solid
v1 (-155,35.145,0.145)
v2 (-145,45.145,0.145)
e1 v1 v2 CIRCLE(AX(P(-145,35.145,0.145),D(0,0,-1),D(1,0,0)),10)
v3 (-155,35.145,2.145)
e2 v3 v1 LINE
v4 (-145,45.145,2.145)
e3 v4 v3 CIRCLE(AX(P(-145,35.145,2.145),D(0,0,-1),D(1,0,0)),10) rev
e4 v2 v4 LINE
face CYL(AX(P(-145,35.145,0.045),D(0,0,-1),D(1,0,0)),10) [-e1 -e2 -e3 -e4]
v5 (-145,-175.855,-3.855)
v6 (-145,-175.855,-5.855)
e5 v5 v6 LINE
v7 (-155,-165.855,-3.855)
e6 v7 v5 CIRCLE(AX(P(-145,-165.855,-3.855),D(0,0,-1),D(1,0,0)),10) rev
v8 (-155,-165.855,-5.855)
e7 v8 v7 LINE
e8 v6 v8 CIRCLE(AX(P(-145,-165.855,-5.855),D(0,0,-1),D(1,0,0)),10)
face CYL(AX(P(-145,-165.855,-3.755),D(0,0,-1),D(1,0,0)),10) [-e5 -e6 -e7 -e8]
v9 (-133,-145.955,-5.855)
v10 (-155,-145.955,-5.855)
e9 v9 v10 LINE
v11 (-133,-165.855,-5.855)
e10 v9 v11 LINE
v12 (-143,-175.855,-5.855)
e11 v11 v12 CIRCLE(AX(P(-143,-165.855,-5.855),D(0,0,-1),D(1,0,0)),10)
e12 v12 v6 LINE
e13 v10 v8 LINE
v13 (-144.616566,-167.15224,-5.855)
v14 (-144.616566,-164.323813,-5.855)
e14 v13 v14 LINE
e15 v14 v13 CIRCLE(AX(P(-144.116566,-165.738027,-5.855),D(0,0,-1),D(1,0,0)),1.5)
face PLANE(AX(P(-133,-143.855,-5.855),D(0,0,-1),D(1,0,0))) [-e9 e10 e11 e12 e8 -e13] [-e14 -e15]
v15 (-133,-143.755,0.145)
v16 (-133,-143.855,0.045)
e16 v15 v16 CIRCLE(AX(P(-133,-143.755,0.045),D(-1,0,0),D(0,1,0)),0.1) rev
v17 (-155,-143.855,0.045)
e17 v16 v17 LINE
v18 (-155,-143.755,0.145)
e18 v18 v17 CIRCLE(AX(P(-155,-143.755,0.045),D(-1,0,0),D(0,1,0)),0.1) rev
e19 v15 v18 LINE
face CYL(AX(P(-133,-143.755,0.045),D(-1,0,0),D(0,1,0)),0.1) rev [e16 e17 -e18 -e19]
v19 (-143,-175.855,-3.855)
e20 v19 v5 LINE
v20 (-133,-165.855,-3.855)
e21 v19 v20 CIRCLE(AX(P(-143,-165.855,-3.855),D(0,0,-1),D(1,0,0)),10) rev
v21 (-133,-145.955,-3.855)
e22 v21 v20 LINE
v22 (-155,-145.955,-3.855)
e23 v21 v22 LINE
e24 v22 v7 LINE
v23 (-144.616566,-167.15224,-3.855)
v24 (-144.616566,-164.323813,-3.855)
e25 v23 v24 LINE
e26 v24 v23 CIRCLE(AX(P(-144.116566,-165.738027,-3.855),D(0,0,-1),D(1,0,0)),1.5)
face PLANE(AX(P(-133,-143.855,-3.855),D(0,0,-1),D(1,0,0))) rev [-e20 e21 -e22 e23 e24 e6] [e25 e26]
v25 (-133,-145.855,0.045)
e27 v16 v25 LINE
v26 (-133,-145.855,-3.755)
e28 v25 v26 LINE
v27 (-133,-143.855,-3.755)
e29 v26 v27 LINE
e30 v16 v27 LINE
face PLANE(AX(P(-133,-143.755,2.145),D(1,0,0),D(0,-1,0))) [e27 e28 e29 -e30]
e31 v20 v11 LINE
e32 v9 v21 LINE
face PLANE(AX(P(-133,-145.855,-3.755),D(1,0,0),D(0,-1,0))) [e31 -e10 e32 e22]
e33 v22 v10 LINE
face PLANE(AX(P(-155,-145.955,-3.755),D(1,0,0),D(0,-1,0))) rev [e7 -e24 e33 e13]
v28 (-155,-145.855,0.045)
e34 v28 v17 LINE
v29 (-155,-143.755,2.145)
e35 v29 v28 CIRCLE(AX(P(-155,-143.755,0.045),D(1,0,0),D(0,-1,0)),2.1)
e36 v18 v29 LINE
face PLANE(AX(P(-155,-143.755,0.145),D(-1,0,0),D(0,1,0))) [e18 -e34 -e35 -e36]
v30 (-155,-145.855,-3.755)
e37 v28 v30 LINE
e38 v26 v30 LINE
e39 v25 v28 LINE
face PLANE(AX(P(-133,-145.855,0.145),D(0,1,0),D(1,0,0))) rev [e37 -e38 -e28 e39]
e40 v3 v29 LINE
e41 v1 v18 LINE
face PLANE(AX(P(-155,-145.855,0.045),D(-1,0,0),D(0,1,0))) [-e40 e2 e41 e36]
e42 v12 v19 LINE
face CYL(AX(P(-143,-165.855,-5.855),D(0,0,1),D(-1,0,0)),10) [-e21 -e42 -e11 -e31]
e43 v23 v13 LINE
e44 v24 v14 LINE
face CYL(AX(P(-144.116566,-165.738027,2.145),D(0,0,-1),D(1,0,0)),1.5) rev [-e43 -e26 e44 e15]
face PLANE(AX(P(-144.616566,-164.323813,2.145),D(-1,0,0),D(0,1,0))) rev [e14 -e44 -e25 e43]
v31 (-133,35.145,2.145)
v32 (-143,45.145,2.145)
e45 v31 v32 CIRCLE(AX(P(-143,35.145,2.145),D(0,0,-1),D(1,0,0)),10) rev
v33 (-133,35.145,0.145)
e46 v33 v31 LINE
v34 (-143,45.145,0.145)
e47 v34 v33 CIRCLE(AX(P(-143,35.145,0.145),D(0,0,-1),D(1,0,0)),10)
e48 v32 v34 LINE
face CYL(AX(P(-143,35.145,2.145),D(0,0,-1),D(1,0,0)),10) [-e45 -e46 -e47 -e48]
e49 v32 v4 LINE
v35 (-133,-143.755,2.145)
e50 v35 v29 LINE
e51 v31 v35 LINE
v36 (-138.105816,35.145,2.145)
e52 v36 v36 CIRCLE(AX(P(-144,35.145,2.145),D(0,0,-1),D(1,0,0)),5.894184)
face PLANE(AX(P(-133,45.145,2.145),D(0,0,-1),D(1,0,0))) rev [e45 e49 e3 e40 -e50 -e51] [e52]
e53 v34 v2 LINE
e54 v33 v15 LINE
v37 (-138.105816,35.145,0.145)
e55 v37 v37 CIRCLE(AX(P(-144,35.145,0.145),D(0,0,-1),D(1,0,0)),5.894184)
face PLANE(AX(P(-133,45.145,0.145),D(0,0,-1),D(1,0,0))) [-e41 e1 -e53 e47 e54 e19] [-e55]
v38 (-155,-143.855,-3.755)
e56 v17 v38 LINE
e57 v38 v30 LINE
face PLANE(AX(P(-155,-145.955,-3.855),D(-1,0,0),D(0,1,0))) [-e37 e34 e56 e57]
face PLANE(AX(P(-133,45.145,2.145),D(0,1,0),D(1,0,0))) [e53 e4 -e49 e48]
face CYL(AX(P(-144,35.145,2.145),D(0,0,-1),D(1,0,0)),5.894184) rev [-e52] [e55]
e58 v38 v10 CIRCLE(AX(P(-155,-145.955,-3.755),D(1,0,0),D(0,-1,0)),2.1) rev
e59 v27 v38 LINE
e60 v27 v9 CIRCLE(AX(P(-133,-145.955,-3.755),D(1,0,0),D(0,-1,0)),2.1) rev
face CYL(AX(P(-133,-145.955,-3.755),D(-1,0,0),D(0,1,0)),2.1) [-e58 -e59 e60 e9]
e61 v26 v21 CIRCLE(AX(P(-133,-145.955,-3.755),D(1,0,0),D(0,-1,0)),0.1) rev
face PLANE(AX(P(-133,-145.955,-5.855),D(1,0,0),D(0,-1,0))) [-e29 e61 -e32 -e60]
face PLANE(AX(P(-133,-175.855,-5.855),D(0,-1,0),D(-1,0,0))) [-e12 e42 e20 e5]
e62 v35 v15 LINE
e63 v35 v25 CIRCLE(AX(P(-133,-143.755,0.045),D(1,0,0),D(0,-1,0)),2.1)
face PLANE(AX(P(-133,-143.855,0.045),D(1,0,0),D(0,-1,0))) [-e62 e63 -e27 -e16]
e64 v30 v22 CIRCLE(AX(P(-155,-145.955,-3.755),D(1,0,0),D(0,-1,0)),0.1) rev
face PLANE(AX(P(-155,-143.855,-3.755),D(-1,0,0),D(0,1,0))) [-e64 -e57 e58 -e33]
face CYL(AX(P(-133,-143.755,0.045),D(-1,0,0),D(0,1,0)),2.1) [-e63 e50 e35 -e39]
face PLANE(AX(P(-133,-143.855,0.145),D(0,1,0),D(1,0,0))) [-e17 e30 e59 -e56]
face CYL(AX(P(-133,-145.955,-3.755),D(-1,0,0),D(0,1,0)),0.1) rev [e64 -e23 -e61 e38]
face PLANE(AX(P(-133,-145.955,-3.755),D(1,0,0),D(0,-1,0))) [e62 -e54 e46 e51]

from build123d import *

# Parameters (mm, degrees)
BASE_FLANGE1_DEPTH      = 11
FILLET1_R               = 10
CUT_EXTRUDE1_DEPTH      = 190.414888538
CUT_EXTRUDE1_DEPTH_BACK = 190.414888538
SKETCH7_R               = 5.894184215
BODY_MOVE_COPY1_ANGLE   = 120


# Sheet-metal steps are written as plain solids
with BuildPart() as part:
    # Sketch2 → Base-Flange1 (new, symmetric)
    with BuildSketch(Plane.XY):
        with BuildLine():
            Line((-189, 0), (-0.1, 0))
            ThreePointArc((-0.1, 0), (-0.029289322, 0.029289322), (0, 0.1))
            Line((0, 0.1), (0, 3.9))
            ThreePointArc((0, 3.9), (0.61507576, 5.38492424), (2.1, 6))
            Line((2.1, 6), (32, 6))
            Line((32, 6), (32, 4))
            Line((32, 4), (2.1, 4))
            ThreePointArc((2.1, 4), (2.029289322, 3.970710678), (2, 3.9))
            Line((2, 3.9), (2, 0.1))
            ThreePointArc((2, 0.1), (1.38492424, -1.38492424), (-0.1, -2))
            Line((-0.1, -2), (-189, -2))
            Line((-189, -2), (-189, 0))
        make_face()
    extrude(amount=BASE_FLANGE1_DEPTH, both=True)

    # Fillet1
    fillet1_edges = [part.edges().sort_by_distance(p)[0] for p in [
        (-189, -1, -11),
        (32, 5, -11),
        (-189, -1, 11),
        (32, 5, 11),
    ]]
    fillet(fillet1_edges, radius=FILLET1_R)

    # Sketch7 → Cut-Extrude1 (cut, two sides: drawn at the far end of the back side and taken through both)
    with BuildSketch(Plane(origin=(0, 0, 0), x_dir=(1, 0, 0), z_dir=(0, 1, 0)).offset(-CUT_EXTRUDE1_DEPTH_BACK)):
        with Locations(Location((-179, 0, 0), (0, 0, 270))):
            Circle(SKETCH7_R)
        with BuildLine():
            Line((20.46881318, 0.616566496), (23.297240305, 0.616566496))
            ThreePointArc((23.297240305, 0.616566496), (21.883026743, -1.383433504), (20.46881318, 0.616566496))
        make_face()
    extrude(amount=CUT_EXTRUDE1_DEPTH + CUT_EXTRUDE1_DEPTH_BACK, mode=Mode.SUBTRACT)


with BuildPart() as part_1:
    # Body-Move/Copy1: moved
    add(part.part.moved(Location((0, 0, 0))).rotate(Axis((-95.951666667, -47.903333333, 48.048333333), (-0.5773502691898587, 0.5773502691889744, -0.5773502691900443)), BODY_MOVE_COPY1_ANGLE))


solid = part_1.part
